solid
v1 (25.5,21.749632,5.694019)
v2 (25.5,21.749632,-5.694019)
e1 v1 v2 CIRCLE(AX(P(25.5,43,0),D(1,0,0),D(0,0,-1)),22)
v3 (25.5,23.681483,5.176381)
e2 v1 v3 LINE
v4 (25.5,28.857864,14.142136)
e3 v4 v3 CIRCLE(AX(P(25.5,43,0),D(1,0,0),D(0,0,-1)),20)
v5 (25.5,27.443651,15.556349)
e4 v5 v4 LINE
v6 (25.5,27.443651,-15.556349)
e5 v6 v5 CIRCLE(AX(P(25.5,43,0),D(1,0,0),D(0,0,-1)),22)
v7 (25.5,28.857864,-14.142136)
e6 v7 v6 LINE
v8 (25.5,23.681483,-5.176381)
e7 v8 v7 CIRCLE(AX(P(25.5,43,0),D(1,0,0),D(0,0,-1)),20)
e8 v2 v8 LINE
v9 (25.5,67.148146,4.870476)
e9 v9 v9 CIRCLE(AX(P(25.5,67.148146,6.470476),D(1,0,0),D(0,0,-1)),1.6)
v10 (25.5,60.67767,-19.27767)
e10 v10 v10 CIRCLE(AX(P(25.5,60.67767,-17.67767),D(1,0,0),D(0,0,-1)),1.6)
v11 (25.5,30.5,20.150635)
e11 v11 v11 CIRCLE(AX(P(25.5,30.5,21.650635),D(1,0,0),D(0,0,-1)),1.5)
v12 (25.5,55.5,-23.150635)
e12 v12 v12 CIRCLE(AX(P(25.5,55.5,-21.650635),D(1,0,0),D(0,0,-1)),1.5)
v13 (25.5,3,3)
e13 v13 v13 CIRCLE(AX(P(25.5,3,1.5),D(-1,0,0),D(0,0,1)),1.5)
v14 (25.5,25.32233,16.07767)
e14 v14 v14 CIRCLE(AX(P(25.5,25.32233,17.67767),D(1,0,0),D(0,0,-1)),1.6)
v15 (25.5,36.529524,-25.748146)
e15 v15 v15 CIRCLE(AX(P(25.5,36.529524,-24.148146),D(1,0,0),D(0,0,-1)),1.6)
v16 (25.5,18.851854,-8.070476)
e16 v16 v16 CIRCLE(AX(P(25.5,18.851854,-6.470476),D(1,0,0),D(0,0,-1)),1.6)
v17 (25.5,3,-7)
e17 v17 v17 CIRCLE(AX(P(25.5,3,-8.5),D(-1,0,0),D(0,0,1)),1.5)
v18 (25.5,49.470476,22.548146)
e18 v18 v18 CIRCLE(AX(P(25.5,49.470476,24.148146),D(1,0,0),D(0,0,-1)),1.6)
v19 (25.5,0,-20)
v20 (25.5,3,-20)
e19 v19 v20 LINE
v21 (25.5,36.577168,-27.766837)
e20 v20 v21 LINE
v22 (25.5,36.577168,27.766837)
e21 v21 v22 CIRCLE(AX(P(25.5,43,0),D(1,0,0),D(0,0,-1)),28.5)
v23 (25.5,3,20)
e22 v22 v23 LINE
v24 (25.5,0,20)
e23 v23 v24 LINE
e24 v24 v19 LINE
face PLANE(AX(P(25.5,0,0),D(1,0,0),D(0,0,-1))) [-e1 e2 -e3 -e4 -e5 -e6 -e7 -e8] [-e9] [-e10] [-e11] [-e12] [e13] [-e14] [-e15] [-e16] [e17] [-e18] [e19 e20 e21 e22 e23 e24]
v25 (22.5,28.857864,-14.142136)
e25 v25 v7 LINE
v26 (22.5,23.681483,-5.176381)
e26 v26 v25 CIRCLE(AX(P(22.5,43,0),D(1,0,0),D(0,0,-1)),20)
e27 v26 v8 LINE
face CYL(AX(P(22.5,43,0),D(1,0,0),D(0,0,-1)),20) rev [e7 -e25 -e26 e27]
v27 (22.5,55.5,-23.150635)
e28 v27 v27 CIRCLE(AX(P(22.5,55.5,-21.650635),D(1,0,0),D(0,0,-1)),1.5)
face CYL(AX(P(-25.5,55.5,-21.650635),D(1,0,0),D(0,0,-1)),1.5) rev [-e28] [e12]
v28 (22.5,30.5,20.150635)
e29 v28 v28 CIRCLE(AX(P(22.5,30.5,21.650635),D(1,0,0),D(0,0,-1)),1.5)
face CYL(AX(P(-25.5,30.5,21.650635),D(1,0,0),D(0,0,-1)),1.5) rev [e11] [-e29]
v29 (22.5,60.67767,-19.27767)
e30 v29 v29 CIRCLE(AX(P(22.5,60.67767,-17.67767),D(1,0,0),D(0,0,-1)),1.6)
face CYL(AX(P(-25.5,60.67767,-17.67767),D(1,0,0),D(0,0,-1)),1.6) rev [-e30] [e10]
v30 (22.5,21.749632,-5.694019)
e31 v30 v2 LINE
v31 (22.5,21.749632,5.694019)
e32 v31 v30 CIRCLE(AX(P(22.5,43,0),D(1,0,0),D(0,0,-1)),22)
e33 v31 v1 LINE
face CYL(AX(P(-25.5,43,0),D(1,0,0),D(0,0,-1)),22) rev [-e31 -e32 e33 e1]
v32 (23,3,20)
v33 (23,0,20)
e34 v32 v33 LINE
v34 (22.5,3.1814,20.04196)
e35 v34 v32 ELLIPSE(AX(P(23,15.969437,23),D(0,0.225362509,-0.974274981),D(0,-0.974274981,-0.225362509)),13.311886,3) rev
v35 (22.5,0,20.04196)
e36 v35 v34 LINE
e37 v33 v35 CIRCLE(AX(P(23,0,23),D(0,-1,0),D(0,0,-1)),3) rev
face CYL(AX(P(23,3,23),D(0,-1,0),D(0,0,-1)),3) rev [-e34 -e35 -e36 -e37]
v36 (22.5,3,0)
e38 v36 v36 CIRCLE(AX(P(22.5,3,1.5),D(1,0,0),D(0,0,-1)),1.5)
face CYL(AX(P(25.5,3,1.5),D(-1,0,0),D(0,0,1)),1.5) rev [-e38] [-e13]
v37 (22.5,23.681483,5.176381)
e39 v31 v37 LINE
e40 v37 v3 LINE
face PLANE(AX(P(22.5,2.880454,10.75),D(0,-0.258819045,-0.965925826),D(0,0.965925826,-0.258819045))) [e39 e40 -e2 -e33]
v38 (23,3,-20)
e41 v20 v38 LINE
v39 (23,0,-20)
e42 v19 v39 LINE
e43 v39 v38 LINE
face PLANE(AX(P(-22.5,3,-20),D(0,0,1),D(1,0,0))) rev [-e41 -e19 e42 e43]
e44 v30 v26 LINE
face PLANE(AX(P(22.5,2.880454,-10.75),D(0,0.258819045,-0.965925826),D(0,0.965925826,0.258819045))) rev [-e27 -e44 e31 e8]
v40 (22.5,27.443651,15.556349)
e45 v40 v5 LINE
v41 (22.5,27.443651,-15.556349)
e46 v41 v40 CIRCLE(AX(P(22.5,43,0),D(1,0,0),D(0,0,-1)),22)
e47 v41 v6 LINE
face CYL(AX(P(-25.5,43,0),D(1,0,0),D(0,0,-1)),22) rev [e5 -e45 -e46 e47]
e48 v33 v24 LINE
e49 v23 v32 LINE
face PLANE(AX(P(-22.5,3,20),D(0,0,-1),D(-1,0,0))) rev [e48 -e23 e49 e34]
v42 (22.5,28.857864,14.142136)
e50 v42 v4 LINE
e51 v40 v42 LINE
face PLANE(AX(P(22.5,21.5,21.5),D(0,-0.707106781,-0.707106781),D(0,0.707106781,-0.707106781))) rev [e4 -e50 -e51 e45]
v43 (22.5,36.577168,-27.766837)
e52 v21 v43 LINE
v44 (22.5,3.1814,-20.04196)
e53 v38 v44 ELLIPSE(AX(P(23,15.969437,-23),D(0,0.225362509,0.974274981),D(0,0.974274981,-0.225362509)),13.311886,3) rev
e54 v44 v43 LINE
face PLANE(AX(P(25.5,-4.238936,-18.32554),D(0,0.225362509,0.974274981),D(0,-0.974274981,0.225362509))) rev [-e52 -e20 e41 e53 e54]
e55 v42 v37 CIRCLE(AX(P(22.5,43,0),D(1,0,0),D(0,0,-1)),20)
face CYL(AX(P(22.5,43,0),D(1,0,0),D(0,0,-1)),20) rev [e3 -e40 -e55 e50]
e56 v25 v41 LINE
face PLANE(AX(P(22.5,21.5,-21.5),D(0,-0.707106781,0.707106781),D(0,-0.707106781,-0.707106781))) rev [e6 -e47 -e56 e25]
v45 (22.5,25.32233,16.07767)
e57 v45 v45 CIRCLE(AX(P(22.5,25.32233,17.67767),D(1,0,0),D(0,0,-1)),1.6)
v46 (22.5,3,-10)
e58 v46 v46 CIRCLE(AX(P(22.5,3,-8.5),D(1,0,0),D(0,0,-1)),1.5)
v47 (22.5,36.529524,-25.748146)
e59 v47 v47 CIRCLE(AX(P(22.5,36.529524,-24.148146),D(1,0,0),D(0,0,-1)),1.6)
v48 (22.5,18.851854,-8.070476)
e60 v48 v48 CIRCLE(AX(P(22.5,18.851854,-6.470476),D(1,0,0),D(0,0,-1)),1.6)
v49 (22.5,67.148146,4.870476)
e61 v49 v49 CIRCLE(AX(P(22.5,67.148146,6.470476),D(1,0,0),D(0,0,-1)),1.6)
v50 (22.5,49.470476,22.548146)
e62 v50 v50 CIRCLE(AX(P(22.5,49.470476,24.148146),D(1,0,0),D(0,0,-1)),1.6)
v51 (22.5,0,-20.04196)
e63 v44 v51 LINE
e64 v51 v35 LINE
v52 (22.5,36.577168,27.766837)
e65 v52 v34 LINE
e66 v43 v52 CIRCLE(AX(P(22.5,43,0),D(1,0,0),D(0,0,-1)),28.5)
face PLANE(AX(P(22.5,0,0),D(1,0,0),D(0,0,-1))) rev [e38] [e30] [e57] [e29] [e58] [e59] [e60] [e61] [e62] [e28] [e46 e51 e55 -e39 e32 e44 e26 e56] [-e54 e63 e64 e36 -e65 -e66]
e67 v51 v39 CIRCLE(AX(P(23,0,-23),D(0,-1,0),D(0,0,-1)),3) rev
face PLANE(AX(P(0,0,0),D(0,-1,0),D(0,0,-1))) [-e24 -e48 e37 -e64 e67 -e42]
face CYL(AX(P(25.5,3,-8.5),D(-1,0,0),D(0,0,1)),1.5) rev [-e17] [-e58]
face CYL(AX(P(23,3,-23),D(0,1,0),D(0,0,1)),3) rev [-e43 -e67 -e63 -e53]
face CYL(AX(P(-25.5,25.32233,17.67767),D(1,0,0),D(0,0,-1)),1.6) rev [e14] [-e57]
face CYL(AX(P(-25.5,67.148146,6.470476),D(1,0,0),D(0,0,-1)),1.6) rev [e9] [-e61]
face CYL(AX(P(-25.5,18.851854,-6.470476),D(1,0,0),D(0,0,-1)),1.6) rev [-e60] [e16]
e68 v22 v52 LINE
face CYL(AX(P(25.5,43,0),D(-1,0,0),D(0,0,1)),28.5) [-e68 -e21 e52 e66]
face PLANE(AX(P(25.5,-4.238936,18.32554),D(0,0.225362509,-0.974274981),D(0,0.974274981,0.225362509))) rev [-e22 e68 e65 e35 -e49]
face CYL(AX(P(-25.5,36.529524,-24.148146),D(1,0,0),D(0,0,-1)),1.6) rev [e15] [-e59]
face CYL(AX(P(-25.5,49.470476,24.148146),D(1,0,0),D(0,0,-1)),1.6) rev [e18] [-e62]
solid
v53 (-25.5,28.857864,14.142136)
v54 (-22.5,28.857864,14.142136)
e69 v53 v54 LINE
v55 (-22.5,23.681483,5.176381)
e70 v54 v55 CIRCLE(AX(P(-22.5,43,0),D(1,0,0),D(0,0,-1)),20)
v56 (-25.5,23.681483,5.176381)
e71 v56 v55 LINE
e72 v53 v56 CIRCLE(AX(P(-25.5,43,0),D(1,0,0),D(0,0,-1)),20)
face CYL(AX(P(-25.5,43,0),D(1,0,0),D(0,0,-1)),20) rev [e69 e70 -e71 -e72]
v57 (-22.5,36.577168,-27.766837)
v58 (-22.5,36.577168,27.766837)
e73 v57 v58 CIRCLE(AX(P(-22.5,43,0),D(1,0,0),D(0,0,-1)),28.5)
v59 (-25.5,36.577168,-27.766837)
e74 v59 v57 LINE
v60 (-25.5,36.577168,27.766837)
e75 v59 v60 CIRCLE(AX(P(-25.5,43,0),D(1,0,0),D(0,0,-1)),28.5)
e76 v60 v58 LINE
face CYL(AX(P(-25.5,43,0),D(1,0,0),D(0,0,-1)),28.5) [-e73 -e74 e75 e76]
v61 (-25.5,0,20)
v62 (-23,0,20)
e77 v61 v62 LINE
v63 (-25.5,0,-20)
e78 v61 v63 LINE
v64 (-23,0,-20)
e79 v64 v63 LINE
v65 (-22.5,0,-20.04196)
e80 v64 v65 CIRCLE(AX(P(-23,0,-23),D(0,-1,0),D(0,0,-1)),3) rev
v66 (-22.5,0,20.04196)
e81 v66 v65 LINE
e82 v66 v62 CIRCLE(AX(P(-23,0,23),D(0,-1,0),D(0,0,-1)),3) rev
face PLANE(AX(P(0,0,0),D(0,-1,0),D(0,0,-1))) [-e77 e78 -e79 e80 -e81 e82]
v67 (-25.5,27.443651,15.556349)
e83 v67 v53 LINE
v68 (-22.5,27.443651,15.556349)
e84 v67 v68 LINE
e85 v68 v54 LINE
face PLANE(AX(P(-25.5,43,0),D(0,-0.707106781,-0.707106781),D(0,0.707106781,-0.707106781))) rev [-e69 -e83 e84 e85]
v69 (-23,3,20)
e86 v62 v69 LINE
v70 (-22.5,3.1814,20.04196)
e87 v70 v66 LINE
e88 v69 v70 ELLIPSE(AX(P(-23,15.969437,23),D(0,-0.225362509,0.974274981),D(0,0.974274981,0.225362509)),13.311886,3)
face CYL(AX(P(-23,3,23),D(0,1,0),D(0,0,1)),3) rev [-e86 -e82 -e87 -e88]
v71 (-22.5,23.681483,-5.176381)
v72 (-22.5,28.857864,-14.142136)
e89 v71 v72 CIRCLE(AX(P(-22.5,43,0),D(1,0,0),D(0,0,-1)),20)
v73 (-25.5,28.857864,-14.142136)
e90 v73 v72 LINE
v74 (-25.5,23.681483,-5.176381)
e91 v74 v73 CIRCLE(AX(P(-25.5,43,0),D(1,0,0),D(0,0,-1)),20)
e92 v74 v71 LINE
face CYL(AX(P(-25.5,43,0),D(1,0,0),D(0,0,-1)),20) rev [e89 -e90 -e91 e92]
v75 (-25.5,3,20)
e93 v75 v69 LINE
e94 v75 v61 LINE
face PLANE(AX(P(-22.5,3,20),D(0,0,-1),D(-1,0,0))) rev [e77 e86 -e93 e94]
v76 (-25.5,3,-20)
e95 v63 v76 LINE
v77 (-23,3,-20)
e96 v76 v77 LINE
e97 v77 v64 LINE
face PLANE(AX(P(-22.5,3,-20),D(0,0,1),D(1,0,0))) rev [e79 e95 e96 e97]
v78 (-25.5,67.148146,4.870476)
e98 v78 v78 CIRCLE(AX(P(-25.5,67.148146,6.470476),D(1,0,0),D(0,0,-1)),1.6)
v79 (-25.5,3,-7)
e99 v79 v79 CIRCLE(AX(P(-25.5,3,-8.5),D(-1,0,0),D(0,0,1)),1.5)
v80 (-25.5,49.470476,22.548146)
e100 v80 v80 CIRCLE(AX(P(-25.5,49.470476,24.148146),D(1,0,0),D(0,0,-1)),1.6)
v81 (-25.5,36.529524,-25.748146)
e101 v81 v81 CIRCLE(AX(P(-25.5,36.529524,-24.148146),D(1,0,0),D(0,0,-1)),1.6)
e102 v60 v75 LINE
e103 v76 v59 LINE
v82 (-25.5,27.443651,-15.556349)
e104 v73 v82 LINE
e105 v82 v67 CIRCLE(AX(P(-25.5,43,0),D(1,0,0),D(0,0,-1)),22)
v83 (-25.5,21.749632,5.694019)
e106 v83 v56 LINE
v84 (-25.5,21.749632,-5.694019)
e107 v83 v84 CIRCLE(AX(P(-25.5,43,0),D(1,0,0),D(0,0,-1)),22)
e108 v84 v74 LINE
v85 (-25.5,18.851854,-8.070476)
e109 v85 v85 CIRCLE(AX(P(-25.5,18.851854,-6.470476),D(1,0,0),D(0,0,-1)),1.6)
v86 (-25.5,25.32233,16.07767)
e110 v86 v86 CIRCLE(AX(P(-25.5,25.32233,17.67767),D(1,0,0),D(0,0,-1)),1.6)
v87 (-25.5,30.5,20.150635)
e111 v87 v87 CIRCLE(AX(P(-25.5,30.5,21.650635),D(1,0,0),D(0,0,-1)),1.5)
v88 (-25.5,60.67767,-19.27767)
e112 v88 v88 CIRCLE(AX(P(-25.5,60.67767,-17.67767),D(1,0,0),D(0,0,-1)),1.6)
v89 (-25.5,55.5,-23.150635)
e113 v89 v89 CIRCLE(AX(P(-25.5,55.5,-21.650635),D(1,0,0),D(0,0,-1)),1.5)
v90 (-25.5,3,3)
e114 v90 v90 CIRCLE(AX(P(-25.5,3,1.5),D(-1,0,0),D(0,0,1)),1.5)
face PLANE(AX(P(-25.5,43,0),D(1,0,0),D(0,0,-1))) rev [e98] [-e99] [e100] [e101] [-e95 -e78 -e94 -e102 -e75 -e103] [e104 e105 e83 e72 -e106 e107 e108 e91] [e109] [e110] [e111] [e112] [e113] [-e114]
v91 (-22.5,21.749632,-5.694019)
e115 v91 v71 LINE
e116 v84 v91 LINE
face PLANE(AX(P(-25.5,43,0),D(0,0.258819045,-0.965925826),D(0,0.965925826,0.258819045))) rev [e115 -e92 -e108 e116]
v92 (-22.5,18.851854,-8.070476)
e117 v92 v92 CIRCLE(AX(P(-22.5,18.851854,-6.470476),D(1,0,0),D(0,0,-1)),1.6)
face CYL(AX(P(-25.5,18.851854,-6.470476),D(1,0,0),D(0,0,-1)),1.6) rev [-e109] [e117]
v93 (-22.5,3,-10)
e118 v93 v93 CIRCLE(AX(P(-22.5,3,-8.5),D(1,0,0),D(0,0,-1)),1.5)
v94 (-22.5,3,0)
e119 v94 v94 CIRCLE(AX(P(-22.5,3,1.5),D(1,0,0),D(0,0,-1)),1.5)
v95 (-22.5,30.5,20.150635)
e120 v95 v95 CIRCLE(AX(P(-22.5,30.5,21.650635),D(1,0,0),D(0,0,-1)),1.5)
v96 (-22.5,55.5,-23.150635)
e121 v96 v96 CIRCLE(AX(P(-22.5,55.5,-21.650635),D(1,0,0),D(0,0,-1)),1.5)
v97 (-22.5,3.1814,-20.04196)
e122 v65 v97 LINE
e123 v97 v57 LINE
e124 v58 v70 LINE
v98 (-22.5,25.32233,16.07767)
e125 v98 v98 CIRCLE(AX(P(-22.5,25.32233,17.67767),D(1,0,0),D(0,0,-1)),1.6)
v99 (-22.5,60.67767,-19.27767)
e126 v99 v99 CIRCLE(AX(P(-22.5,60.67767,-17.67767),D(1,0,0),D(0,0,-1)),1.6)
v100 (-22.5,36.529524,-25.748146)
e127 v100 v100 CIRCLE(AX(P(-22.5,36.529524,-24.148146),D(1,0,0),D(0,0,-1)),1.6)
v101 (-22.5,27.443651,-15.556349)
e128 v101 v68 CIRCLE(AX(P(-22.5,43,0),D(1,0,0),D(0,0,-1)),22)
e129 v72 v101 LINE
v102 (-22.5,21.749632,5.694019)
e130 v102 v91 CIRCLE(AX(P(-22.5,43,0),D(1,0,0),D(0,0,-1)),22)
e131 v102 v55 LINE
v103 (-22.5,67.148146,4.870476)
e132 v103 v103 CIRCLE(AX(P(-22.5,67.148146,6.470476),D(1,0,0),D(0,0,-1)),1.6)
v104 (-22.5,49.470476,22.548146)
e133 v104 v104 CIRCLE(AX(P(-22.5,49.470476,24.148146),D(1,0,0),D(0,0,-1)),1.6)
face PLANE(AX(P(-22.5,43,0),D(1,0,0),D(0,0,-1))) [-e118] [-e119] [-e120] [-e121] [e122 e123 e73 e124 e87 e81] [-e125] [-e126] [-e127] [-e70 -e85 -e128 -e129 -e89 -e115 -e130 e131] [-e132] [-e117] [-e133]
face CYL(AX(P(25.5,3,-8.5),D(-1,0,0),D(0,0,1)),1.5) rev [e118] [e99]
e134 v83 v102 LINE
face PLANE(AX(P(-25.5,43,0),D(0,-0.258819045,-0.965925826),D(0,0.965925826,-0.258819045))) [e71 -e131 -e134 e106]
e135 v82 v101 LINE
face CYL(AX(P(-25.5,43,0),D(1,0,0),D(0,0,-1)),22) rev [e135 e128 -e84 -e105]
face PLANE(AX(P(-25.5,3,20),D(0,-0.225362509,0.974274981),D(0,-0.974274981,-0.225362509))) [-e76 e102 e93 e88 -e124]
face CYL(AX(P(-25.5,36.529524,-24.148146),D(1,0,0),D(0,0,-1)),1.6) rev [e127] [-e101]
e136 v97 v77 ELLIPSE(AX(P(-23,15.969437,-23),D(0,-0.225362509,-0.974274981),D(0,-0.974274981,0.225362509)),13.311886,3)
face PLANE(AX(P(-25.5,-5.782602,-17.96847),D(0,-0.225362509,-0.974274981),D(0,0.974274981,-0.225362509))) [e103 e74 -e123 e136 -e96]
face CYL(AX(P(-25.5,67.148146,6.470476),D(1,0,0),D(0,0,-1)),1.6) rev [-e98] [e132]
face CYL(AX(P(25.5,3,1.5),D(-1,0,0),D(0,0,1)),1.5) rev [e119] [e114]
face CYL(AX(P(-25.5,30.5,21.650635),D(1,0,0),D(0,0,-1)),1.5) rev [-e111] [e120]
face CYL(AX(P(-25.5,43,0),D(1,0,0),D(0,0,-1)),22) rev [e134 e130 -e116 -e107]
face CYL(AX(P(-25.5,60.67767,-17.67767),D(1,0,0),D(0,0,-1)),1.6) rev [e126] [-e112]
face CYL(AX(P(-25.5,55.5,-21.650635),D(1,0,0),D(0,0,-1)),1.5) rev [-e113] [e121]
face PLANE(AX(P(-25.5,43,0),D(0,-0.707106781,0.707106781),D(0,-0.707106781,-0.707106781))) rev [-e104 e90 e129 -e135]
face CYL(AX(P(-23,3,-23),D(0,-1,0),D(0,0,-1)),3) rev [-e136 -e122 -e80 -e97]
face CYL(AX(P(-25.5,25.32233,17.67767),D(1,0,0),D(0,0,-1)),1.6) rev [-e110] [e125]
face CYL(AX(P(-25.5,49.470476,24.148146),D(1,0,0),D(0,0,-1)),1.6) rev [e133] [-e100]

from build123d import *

# Parameters (mm, degrees)
SKETCH_1_W          = 45
SKETCH_1_H          = 40
EXTRUDE_1_DEPTH     = 3
SKETCH_2_R          = 28.5
SKETCH_2_W          = 40
SKETCH_2_H          = 3
EXTRUDE_2_DEPTH     = 3
EXTRUDE_START       = -48
SKETCH_2_4_R        = 28.5
SKETCH_2_4_W        = 40
SKETCH_2_4_H        = 3
EXTRUDE_3_DEPTH     = 3
SKETCH_3_R          = 22
SKETCH_3_R_2        = 1.6
CUT_EXTRUDE_1_DEPTH = 93.333634175
EXTRUDE_4_DEPTH     = 3
EXTRUDE_5_DEPTH     = 3
SKETCH_7_R          = 1.5
CUT_EXTRUDE_3_DEPTH = 93.333634175
SKETCH_10_W         = 40
SKETCH_10_H         = 60
EXTRUDE_6_DEPTH     = 3
SKETCH_8_R          = 15.02
CUT_EXTRUDE_4_DEPTH = 80.009493101
SKETCH_15_R         = 2.1
CUT_EXTRUDE_5_DEPTH = 80.009493101
FILLET_1_R          = 3
SKETCH_16_W         = 45
SKETCH_16_H         = 60
CUT_EXTRUDE_6_DEPTH = 10
SKETCH_17_R         = 1.5
CUT_EXTRUDE_7_DEPTH = 93.333634175


with BuildPart() as part:
    # 草图1 → 凸台-拉伸1 (new body)
    with BuildSketch(Plane(origin=(0, 0, 0), x_dir=(1, 0, 0), z_dir=(0, 1, 0))):
        Rectangle(SKETCH_1_W, SKETCH_1_H)
    extrude(amount=EXTRUDE_1_DEPTH)

    # 草图2 → 凸台-拉伸2 (add)
    with BuildSketch(Plane(origin=(22.5, 0, 0), x_dir=(0, 0, -1), z_dir=(1, 0, 0))):
        with Locations((0, 43)):
            Circle(SKETCH_2_R)
        with BuildLine():
            ThreePointArc((27.76683697, 36.577168485), (0, 14.5), (-27.76683697, 36.577168485))
            Line((-27.76683697, 36.577168485), (-20, 3))
            Line((-20, 3), (20, 3))
            Line((20, 3), (27.76683697, 36.577168485))
        make_face()
        with Locations((0, 1.5)):
            Rectangle(SKETCH_2_W, SKETCH_2_H)
    extrude(amount=EXTRUDE_2_DEPTH)

    # 草图2<4> → 凸台-拉伸3 (add)
    with BuildSketch(Plane(origin=(22.5, 0, 0), x_dir=(0, 0, -1), z_dir=(1, 0, 0)).offset(EXTRUDE_START)):
        with Locations((0, 43)):
            Circle(SKETCH_2_4_R)
        with BuildLine():
            ThreePointArc((27.76683697, 36.577168485), (0, 14.5), (-27.76683697, 36.577168485))
            Line((-27.76683697, 36.577168485), (-20, 3))
            Line((-20, 3), (20, 3))
            Line((20, 3), (27.76683697, 36.577168485))
        make_face()
        with Locations((0, 1.5)):
            Rectangle(SKETCH_2_4_W, SKETCH_2_4_H)
    extrude(amount=EXTRUDE_3_DEPTH)

    # 草图3 → 切除-拉伸1 (cut, through all)
    with BuildSketch(Plane(origin=(25.5, 0, 0), x_dir=(0, 0, -1), z_dir=(1, 0, 0))):
        with Locations((0, 43)):
            Circle(SKETCH_3_R)
        with Locations((17.67766953, 60.67766953)):
            Circle(SKETCH_3_R_2)
        with Locations((24.148145657, 36.529523872)):
            Circle(SKETCH_3_R_2)
        with Locations((6.470476128, 18.851854343)):
            Circle(SKETCH_3_R_2)
        with Locations((-17.67766953, 25.32233047)):
            Circle(SKETCH_3_R_2)
        with Locations((-24.148145657, 49.470476128)):
            Circle(SKETCH_3_R_2)
        with Locations((-6.470476128, 67.148145657)):
            Circle(SKETCH_3_R_2)
    extrude(amount=-CUT_EXTRUDE_1_DEPTH, mode=Mode.SUBTRACT)

    # 草图4 → 凸台-拉伸4 (add)
    with BuildSketch(Plane(origin=(25.5, 0, 0), x_dir=(0, 0, -1), z_dir=(1, 0, 0))):
        with BuildLine():
            Line((-14.142135624, 28.857864376), (-15.556349186, 27.443650814))
            ThreePointArc((-15.556349186, 27.443650814), (-11, 23.947441117), (-5.694018992, 21.749631822))
            Line((-5.694018992, 21.749631822), (-5.176380902, 23.681483474))
            ThreePointArc((-5.176380902, 23.681483474), (-10, 25.679491924), (-14.142135624, 28.857864376))
        make_face()
        with BuildLine():
            ThreePointArc((5.694018992, 21.749631822), (11, 23.947441117), (15.556349186, 27.443650814))
            Line((15.556349186, 27.443650814), (14.142135624, 28.857864376))
            ThreePointArc((14.142135624, 28.857864376), (10, 25.679491924), (5.176380902, 23.681483474))
            Line((5.176380902, 23.681483474), (5.694018992, 21.749631822))
        make_face()
    extrude(amount=-EXTRUDE_4_DEPTH)

    # 草图4<3> → 凸台-拉伸5 (add)
    with BuildSketch(Plane(origin=(25.5, 0, 0), x_dir=(0, 0, -1), z_dir=(1, 0, 0)).offset(EXTRUDE_START)):
        with BuildLine():
            Line((-14.142135624, 28.857864376), (-15.556349186, 27.443650814))
            ThreePointArc((-15.556349186, 27.443650814), (-11, 23.947441117), (-5.694018992, 21.749631822))
            Line((-5.694018992, 21.749631822), (-5.176380902, 23.681483474))
            ThreePointArc((-5.176380902, 23.681483474), (-10, 25.679491924), (-14.142135624, 28.857864376))
        make_face()
        with BuildLine():
            ThreePointArc((5.694018992, 21.749631822), (11, 23.947441117), (15.556349186, 27.443650814))
            Line((15.556349186, 27.443650814), (14.142135624, 28.857864376))
            ThreePointArc((14.142135624, 28.857864376), (10, 25.679491924), (5.176380902, 23.681483474))
            Line((5.176380902, 23.681483474), (5.694018992, 21.749631822))
        make_face()
    extrude(amount=-EXTRUDE_5_DEPTH)

    # 草图7 → 切除-拉伸3 (cut, through all)
    with BuildSketch(Plane(origin=(25.5, 0, 0), x_dir=(0, 0, -1), z_dir=(1, 0, 0))):
        with Locations((21.650635095, 55.5)):
            Circle(SKETCH_7_R)
        with Locations((-21.650635095, 30.5)):
            Circle(SKETCH_7_R)
    extrude(amount=-CUT_EXTRUDE_3_DEPTH, mode=Mode.SUBTRACT)

    # 草图10 → 凸台-拉伸6 (add)
    with BuildSketch(Plane(origin=(0, 3, 0), x_dir=(1, 0, 0), z_dir=(0, 1, 0))):
        Rectangle(SKETCH_10_W, SKETCH_10_H)
    extrude(amount=-EXTRUDE_6_DEPTH)

    # 草图8 → 切除-拉伸4 (cut, through all)
    with BuildSketch(Plane(origin=(0, 3, 0), x_dir=(1, 0, 0), z_dir=(0, 1, 0))):
        with Locations(Location((0, 0, 0), (0, 0, 270))):
            Circle(SKETCH_8_R)
    extrude(amount=-CUT_EXTRUDE_4_DEPTH, mode=Mode.SUBTRACT)

    # 草图15 → 切除-拉伸5 (cut, through all)
    with BuildSketch(Plane(origin=(0, 3, 0), x_dir=(1, 0, 0), z_dir=(0, 1, 0))):
        with Locations(Location((-15, 25, 0), (0, 0, 270))):
            Circle(SKETCH_15_R)
        with Locations(Location((15, 25, 0), (0, 0, 270))):
            Circle(SKETCH_15_R)
        with Locations(Location((15, -25, 0), (0, 0, 270))):
            Circle(SKETCH_15_R)
        with Locations(Location((-15, -25, 0), (0, 0, 270))):
            Circle(SKETCH_15_R)
    extrude(amount=-CUT_EXTRUDE_5_DEPTH, mode=Mode.SUBTRACT)

    # 圆角1
    # the kernel refuses this fillet: 3 mm, written as the material it adds along each edge
    with BuildSketch(Plane(origin=(20, 0, -20), x_dir=(0, 0, -1), z_dir=(0, 1, 0)), Plane(origin=(20, 3, 20), x_dir=(0, 0, 1), z_dir=(0, -1, 0))) as fillet_1_piece_1:
        with BuildLine():
            CenterArc((FILLET_1_R, -FILLET_1_R), FILLET_1_R, 90, 90)
            Line((0, -FILLET_1_R), (0, 0))
            Line((0, 0), (FILLET_1_R, 0))
        make_face()
    extrude(amount=3)
    with BuildSketch(Plane(origin=(20, -7.5, -20), x_dir=(0, 0, -1), z_dir=(0, 1, 0))) as fillet_1_piece_2_section:
        with BuildLine():
            CenterArc((FILLET_1_R, -FILLET_1_R), FILLET_1_R, 90, 90)
            Line((0, -FILLET_1_R), (0, 0))
            Line((0, 0), (FILLET_1_R, 0))
        make_face()
    fillet_1_piece_2 = extrude(amount=18, mode=Mode.PRIVATE)
    fillet_1_piece_2 = split(fillet_1_piece_2, bisect_by=Plane(origin=(22.583124197, 3, -20.019967546), z_dir=(0, 1, 0)), keep=Keep.TOP, mode=Mode.PRIVATE)
    fillet_1_piece_2 = split(fillet_1_piece_2, bisect_by=Plane(origin=(22.5, 3.043161306, -20.019967546), z_dir=(1, 0, 0)), keep=Keep.TOP, mode=Mode.PRIVATE)
    add(fillet_1_piece_2)
    with BuildSketch(Plane(origin=(20, 10.5, 20), x_dir=(0, 0, 1), z_dir=(0, -1, 0))) as fillet_1_piece_3_section:
        with BuildLine():
            CenterArc((FILLET_1_R, -FILLET_1_R), FILLET_1_R, 90, 90)
            Line((0, -FILLET_1_R), (0, 0))
            Line((0, 0), (FILLET_1_R, 0))
        make_face()
    fillet_1_piece_3 = extrude(amount=10.5, mode=Mode.PRIVATE)
    fillet_1_piece_3 = split(fillet_1_piece_3, bisect_by=Plane(origin=(22.5, 3.043161306, 20.019967546), z_dir=(1, 0, 0)), keep=Keep.TOP, mode=Mode.PRIVATE)
    add(fillet_1_piece_3)
    with BuildSketch(Plane(origin=(-20, 10.5, -20), x_dir=(-1, 0, 0), z_dir=(0, -1, 0))) as fillet_1_piece_4_section:
        with BuildLine():
            CenterArc((FILLET_1_R, FILLET_1_R), FILLET_1_R, 180, 90)
            Line((0, FILLET_1_R), (0, 0))
            Line((0, 0), (FILLET_1_R, 0))
        make_face()
    fillet_1_piece_4 = extrude(amount=10.5, mode=Mode.PRIVATE)
    fillet_1_piece_4 = split(fillet_1_piece_4, bisect_by=Plane(origin=(-22.5, 3.043161308, -20.019967545), z_dir=(-1, 0, 0)), keep=Keep.TOP, mode=Mode.PRIVATE)
    add(fillet_1_piece_4)
    with BuildSketch(Plane(origin=(-20, 3, -20), x_dir=(-1, 0, 0), z_dir=(0, -1, 0)), Plane(origin=(-20, 0, 20), x_dir=(-1, 0, 0), z_dir=(0, 1, 0))) as fillet_1_piece_5:
        with BuildLine():
            CenterArc((FILLET_1_R, FILLET_1_R), FILLET_1_R, 180, 90)
            Line((0, FILLET_1_R), (0, 0))
            Line((0, 0), (FILLET_1_R, 0))
        make_face()
    extrude(amount=3)
    with BuildSketch(Plane(origin=(-20, 0, 20), x_dir=(-1, 0, 0), z_dir=(0, 1, 0))) as fillet_1_piece_6_section:
        with BuildLine():
            CenterArc((FILLET_1_R, FILLET_1_R), FILLET_1_R, 180, 90)
            Line((0, FILLET_1_R), (0, 0))
            Line((0, 0), (FILLET_1_R, 0))
        make_face()
    fillet_1_piece_6 = extrude(amount=10.5, mode=Mode.PRIVATE)
    fillet_1_piece_6 = split(fillet_1_piece_6, bisect_by=Plane(origin=(-22.5, 1.5, 20.012572796), z_dir=(-1, 0, 0)), keep=Keep.TOP, mode=Mode.PRIVATE)
    add(fillet_1_piece_6)
    # the kernel refuses this fillet: 3 mm, written as the material it takes off along each edge
    with BuildSketch(Plane(origin=(20, 10.5, -30), x_dir=(-1, 0, 0), z_dir=(0, -1, 0)), Plane(origin=(-20, 10.5, 30), x_dir=(1, 0, 0), z_dir=(0, -1, 0)), Plane(origin=(20, 10.5, 30), x_dir=(0, 0, -1), z_dir=(0, -1, 0))) as fillet_1_2_piece_1:
        with BuildLine():
            CenterArc((FILLET_1_R, -FILLET_1_R), FILLET_1_R, 90, 90)
            Line((0, -FILLET_1_R), (0, 0))
            Line((0, 0), (FILLET_1_R, 0))
        make_face()
    extrude(amount=18, mode=Mode.SUBTRACT)
    with BuildSketch(Plane(origin=(-20, 10.5, -30), x_dir=(1, 0, 0), z_dir=(0, -1, 0))) as fillet_1_2_piece_2:
        with BuildLine():
            CenterArc((FILLET_1_R, FILLET_1_R), FILLET_1_R, 180, 90)
            Line((0, FILLET_1_R), (0, 0))
            Line((0, 0), (FILLET_1_R, 0))
        make_face()
    extrude(amount=18, mode=Mode.SUBTRACT)

    # 草图16 → 切除-拉伸6 (cut)
    with BuildSketch(Plane(origin=(0, 3, 0), x_dir=(1, 0, 0), z_dir=(0, 1, 0))):
        Rectangle(SKETCH_16_W, SKETCH_16_H)
    extrude(amount=-CUT_EXTRUDE_6_DEPTH, mode=Mode.SUBTRACT)


with BuildPart() as cut_extrude_6_piece_1:
    # of the separate pieces the step leaves, piece 1, a body of its own (cut_extrude_6_pieces)
    add(part.part.solids().sort_by_distance((-23, 0, 20))[0])


with BuildPart() as cut_extrude_6_piece_2:
    # of the separate pieces the step leaves, piece 2, a body of its own (cut_extrude_6_pieces)
    add(part.part.solids().sort_by_distance((22.5, 0, 20.041960108))[0])


with BuildPart() as cut_extrude_7_tool:
    # 草图17 → 切除-拉伸7 (new, through all)
    with BuildSketch(Plane.ZY.offset(25.5)):
        with Locations((-8.5, 3)):
            Circle(SKETCH_17_R)
        with Locations((1.5, 3)):
            Circle(SKETCH_17_R)
    extrude(amount=-CUT_EXTRUDE_7_DEPTH)


with BuildPart() as cut_extrude_6_piece_1_1:
    add(cut_extrude_6_piece_1.part)

    # 切除-拉伸7: cut by cut_extrude_7_tool
    add(cut_extrude_7_tool.part, mode=Mode.SUBTRACT)


with BuildPart() as cut_extrude_6_piece_2_1:
    add(cut_extrude_6_piece_2.part)

    # 切除-拉伸7: cut by cut_extrude_7_tool
    add(cut_extrude_7_tool.part, mode=Mode.SUBTRACT)


solid = Compound([cut_extrude_6_piece_1_1.part, cut_extrude_6_piece_2_1.part])
